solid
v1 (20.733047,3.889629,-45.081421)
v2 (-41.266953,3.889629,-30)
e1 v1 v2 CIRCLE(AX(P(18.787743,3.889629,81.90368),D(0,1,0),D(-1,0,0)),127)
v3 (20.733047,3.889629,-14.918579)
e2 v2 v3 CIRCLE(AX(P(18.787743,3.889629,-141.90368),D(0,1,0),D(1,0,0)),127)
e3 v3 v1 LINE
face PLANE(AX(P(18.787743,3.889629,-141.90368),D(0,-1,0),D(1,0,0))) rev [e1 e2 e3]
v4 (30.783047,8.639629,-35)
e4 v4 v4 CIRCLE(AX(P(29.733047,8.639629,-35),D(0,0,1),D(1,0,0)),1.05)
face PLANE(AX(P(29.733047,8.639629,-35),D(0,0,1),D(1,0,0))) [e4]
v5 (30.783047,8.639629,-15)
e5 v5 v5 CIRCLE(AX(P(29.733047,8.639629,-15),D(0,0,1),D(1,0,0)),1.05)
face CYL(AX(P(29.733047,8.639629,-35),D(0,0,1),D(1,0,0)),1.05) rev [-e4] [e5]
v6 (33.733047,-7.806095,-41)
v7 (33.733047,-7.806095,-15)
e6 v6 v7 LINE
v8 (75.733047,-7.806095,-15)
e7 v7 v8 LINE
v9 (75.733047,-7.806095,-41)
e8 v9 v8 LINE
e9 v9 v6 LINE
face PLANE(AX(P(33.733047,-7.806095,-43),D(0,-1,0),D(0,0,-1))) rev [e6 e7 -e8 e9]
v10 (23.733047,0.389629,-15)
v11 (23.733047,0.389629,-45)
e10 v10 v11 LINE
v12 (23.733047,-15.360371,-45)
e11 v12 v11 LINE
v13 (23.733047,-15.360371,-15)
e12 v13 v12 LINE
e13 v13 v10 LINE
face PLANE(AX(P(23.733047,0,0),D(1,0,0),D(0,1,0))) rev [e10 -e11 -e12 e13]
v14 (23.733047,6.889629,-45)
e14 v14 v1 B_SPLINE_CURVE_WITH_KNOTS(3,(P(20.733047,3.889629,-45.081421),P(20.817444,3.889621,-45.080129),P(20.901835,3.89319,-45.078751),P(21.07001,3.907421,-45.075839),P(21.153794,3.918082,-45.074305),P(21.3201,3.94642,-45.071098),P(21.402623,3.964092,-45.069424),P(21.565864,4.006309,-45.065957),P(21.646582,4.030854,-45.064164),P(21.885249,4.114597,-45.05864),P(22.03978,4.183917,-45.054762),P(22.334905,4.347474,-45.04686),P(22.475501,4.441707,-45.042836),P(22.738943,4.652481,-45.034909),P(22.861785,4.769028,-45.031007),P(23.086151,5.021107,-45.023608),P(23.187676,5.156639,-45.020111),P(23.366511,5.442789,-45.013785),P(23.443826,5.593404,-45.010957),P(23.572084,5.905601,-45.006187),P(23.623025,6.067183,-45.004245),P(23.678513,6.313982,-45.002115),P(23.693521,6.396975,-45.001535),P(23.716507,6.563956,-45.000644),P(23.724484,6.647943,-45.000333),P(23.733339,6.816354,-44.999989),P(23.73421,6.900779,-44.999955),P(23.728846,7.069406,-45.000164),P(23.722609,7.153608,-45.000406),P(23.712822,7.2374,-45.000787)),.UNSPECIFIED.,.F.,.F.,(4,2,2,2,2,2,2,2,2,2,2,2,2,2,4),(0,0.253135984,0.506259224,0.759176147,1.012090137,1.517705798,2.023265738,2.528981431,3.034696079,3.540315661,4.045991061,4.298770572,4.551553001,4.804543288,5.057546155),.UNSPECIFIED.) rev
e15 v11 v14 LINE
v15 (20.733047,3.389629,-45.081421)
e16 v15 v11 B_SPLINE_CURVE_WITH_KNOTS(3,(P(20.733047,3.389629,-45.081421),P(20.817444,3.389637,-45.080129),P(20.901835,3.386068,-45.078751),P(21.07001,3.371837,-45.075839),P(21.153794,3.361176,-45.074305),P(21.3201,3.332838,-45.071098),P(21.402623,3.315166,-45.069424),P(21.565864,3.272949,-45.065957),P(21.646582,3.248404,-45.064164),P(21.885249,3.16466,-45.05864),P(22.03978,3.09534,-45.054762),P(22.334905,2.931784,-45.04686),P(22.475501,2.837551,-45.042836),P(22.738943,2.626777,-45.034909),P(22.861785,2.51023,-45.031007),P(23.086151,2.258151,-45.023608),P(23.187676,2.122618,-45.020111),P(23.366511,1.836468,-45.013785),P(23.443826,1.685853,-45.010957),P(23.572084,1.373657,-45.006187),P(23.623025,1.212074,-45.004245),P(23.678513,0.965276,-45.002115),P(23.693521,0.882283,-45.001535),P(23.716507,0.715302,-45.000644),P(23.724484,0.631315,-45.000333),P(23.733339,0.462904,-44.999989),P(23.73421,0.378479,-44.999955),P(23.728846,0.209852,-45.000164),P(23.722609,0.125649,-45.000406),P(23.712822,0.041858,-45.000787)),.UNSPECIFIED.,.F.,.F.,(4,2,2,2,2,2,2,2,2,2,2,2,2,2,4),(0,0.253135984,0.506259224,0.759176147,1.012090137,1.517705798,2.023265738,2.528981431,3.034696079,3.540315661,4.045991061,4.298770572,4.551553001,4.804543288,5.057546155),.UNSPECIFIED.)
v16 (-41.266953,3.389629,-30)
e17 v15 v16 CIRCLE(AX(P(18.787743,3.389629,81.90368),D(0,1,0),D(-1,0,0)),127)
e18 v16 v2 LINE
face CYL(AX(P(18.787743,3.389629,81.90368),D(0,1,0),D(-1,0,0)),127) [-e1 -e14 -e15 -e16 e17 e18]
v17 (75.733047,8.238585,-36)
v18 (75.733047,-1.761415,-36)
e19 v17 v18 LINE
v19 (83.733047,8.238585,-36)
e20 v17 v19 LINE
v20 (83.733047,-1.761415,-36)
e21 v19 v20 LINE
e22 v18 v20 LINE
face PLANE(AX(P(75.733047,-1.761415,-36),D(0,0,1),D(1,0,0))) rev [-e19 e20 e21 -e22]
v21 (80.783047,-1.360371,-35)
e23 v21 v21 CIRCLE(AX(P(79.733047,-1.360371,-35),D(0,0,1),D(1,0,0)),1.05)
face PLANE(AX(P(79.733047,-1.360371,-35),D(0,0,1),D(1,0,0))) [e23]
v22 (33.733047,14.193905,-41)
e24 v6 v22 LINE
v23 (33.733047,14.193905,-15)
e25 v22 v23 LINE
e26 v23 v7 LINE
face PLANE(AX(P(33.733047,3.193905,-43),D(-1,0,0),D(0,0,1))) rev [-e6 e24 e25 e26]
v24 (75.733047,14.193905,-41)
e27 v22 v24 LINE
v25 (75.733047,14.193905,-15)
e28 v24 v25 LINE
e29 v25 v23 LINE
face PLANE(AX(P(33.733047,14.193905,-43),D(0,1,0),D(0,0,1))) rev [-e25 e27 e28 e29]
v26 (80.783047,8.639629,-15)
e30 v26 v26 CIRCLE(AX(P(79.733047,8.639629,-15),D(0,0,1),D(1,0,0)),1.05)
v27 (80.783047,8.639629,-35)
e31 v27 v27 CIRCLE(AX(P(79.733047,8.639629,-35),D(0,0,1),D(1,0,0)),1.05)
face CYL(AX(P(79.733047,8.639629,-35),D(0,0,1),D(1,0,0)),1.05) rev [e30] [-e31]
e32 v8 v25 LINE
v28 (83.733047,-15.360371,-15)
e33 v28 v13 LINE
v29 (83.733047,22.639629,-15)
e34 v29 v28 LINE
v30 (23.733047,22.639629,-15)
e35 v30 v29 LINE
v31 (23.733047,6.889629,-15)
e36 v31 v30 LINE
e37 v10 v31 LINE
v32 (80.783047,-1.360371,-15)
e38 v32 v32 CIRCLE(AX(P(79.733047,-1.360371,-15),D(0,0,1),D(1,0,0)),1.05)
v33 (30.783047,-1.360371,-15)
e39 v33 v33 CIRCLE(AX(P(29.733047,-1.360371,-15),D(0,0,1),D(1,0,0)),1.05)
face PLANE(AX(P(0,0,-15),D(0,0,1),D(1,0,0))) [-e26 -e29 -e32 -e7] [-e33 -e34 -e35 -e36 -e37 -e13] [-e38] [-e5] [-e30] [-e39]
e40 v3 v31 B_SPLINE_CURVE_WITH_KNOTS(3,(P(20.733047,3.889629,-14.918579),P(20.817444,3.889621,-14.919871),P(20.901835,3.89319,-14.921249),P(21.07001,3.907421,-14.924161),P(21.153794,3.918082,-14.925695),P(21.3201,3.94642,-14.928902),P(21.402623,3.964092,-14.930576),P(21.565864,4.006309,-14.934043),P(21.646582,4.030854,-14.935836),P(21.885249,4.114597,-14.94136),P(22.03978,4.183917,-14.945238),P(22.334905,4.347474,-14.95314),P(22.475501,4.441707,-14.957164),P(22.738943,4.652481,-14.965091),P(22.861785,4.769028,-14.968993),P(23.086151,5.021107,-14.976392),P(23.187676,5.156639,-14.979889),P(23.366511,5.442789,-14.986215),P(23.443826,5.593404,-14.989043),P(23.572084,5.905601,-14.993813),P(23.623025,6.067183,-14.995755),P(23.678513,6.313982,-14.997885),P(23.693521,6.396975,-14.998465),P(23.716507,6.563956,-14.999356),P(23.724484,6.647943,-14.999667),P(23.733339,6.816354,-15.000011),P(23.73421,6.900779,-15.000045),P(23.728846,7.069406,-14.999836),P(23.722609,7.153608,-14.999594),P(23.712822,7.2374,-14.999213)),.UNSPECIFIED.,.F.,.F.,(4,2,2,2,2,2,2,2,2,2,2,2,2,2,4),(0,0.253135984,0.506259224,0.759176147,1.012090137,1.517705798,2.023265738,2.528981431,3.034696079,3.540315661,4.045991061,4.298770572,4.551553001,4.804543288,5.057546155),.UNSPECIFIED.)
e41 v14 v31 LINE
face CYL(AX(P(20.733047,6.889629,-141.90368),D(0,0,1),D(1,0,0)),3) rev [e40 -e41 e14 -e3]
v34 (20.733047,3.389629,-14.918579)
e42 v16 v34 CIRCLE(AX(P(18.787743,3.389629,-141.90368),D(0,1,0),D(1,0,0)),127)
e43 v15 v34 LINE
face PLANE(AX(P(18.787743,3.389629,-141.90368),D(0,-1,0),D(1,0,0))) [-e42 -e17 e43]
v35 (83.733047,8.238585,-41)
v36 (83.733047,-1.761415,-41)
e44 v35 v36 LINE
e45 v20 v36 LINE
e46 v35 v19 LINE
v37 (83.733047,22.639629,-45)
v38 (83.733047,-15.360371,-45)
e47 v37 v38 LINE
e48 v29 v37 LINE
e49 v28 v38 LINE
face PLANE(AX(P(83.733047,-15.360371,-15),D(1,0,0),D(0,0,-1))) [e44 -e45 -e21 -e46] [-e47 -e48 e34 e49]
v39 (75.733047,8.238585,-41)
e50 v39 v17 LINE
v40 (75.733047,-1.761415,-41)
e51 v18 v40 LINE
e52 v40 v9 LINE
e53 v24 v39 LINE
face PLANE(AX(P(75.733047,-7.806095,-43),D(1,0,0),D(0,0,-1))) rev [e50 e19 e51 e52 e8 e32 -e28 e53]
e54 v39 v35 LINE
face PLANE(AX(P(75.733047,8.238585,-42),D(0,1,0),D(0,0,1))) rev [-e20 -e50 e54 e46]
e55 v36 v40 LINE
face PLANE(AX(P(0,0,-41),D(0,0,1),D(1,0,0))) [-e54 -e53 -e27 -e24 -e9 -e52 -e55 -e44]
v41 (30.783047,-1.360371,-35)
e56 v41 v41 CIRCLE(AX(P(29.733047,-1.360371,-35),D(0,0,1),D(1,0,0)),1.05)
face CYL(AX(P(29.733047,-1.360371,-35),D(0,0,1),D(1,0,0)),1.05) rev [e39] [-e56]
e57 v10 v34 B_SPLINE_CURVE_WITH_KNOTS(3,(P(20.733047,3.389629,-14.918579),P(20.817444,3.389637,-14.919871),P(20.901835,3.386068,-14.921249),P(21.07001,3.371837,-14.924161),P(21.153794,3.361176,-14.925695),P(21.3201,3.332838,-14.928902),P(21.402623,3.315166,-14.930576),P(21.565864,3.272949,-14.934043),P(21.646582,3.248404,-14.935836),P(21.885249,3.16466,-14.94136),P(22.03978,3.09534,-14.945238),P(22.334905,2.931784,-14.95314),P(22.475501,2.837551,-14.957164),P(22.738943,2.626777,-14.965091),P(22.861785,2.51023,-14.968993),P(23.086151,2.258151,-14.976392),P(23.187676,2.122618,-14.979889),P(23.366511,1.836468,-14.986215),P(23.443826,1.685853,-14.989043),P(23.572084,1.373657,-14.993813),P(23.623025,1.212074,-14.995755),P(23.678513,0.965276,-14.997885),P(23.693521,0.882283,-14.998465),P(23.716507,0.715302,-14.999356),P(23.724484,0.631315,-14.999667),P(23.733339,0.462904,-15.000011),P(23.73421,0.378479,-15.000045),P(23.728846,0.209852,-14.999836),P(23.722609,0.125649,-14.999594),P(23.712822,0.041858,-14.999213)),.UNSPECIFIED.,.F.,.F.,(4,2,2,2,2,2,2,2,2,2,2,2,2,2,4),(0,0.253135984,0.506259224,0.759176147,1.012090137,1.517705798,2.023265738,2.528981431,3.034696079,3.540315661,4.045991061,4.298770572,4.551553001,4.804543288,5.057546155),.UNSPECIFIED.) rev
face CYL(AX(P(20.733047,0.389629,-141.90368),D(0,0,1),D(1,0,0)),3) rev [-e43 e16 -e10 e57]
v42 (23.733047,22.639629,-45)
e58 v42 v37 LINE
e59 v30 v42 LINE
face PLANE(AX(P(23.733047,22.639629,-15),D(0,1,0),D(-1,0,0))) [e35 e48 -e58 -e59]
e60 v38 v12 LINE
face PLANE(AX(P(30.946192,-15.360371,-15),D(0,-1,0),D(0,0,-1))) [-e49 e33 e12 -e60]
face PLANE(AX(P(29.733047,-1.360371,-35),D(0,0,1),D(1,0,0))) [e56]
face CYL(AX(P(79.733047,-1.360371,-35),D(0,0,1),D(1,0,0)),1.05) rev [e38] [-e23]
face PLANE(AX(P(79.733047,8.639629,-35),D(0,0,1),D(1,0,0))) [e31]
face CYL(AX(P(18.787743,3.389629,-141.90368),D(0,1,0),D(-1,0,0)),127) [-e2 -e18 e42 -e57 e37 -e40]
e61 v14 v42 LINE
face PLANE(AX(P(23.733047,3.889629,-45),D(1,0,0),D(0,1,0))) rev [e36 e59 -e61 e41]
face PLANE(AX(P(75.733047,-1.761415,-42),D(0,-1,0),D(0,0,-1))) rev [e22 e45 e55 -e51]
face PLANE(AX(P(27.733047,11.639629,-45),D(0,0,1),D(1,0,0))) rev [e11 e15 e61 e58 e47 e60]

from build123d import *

# Parameters (mm, degrees)
BOSS_EXTRUDE1_DEPTH  = 4
CUT_EXTRUDE1_DEPTH   = 3
SKETCH5_W            = 49
SKETCH5_H            = 16
BOSS_EXTRUDE2_DEPTH  = 4
BOSS_EXTRUDE15_DEPTH = 30
SKETCH20_R           = 2.4
CUT_EXTRUDE26_DEPTH  = 1
FILLET8_R            = 4
FILLET12_R           = 4
CUT_EXTRUDE_8_DEPTH  = 28
SKETCH_6_R           = 1.05
CUT_EXTRUDE_9_DEPTH  = 20
SKETCH_8_W           = 6
SKETCH_8_H           = 10
CUT_EXTRUDE_10_DEPTH = 8
BOSS_EXTRUDE14_DEPTH = 4
CUT_EXTRUDE27_DEPTH  = 19
BOSS_EXTRUDE16_DEPTH = 19.25
CUT_EXTRUDE28_DEPTH  = 18.75
FILLET13_R           = 3
FILLET14_R           = 3


with BuildPart() as part:
    # Sketch2 → Boss-Extrude1 (new body)
    with BuildSketch(Plane.XY):
        with BuildLine():
            Line((23.733047461, 11.63962887), (23.733047461, -4.36037113))
            Line((23.733047461, -4.36037113), (-21.266952539, -4.36037113))
            ThreePointArc((-21.266952539, -4.36037113), (-27.597931628, 3.63962887), (-21.266952539, 11.63962887))
            Line((-21.266952539, 11.63962887), (23.733047461, 11.63962887))
        make_face()
    extrude(amount=BOSS_EXTRUDE1_DEPTH)

    # Sketch1 → Cut-Extrude1 (cut)
    with BuildSketch(Plane.XY):
        with BuildLine():
            Line((-6.25004119, 8.63962887), (-20.04279291, 6.23962887))
            ThreePointArc((-20.04279291, 6.23962887), (-22.105421524, 3.63962887), (-20.04279291, 1.03962887))
            Line((-20.04279291, 1.03962887), (-6.25004119, -1.36037113))
            ThreePointArc((-6.25004119, -1.36037113), (-2.105421524, -2.86037113), (2.039198142, -1.36037113))
            Line((2.039198142, -1.36037113), (15.831949862, 1.03962887))
            ThreePointArc((15.831949862, 1.03962887), (17.894578476, 3.63962887), (15.831949862, 6.23962887))
            Line((15.831949862, 6.23962887), (2.039198142, 8.63962887))
            ThreePointArc((2.039198142, 8.63962887), (-2.105421524, 10.13962887), (-6.25004119, 8.63962887))
        make_face()
    extrude(amount=CUT_EXTRUDE1_DEPTH, mode=Mode.SUBTRACT)

    # Sketch5 → Boss-Extrude2 (add)
    with BuildSketch(Plane(origin=(23.733047461, 0, 0), x_dir=(0, 0, -1), z_dir=(1, 0, 0))):
        with Locations((20.5, 3.63962887)):
            Rectangle(SKETCH5_W, SKETCH5_H)
    extrude(amount=BOSS_EXTRUDE2_DEPTH)

    # Sketch6 → Boss-Extrude15 (add)
    with BuildSketch(Plane(origin=(0, 0, -45), x_dir=(-1, 0, 0), z_dir=(0, 0, -1))):
        Polygon((-30.946192459, -15.36037113), (-83.733047461, -15.36037113), (-83.733047461, 22.63962887), (-23.733047461, 22.63962887), (-23.733047461, -15.36037113), align=None)
    extrude(amount=-BOSS_EXTRUDE15_DEPTH)

    # Sketch20 → Cut-Extrude26 (cut)
    with BuildSketch(Plane(origin=(0, 0, 3), x_dir=(-1, 0, 0), z_dir=(0, 0, -1))):
        with Locations((2.105421524, 3.63962887)):
            Circle(SKETCH20_R)
    extrude(amount=-CUT_EXTRUDE26_DEPTH, mode=Mode.SUBTRACT)

    # Fillet8
    fillet8_edges = [part.edges().sort_by_distance(p)[0] for p in [
        (23.733047461, 3.63962887, 0),
    ]]
    fillet(fillet8_edges, radius=FILLET8_R)

    # Fillet12
    fillet12_edges = [part.edges().sort_by_distance(p)[0] for p in [
        (27.733047461, 3.63962887, 4),
    ]]
    fillet(fillet12_edges, radius=FILLET12_R)

    # 草圖5 → 除料-伸長8 (cut)
    with BuildSketch(Plane.XY.offset(-15)):
        Polygon((75.733047461, -7.806095257), (75.733047461, 14.193904743), (33.733047461, 14.193904743), (33.733047461, 3.193904743), (33.733047461, -7.806095257), align=None)
    extrude(amount=-CUT_EXTRUDE_8_DEPTH, mode=Mode.SUBTRACT)

    # 草圖6 → 除料-伸長9 (cut)
    with BuildSketch(Plane.XY.offset(-15)):
        with Locations((29.733047461, 8.63962887)):
            Circle(SKETCH_6_R)
        with Locations((29.733047461, -1.36037113)):
            Circle(SKETCH_6_R)
        with Locations((79.733047461, 8.63962887)):
            Circle(SKETCH_6_R)
        with Locations((79.733047461, -1.36037113)):
            Circle(SKETCH_6_R)
    extrude(amount=-CUT_EXTRUDE_9_DEPTH, mode=Mode.SUBTRACT)

    # 草圖8 → 除料-伸長10 (cut)
    with BuildSketch(Plane(origin=(83.733047461, 0, 0), x_dir=(0, 0, -1), z_dir=(1, 0, 0))):
        with Locations((39, 3.238584995)):
            Rectangle(SKETCH_8_W, SKETCH_8_H)
    extrude(amount=-CUT_EXTRUDE_10_DEPTH, mode=Mode.SUBTRACT)

    # Sketch6<2> → Boss-Extrude14 (add)
    with BuildSketch(Plane(origin=(0, 0, -45), x_dir=(-1, 0, 0), z_dir=(0, 0, -1))):
        Polygon((-30.946192459, -15.36037113), (-83.733047461, -15.36037113), (-83.733047461, 22.63962887), (-23.733047461, 22.63962887), (-23.733047461, -15.36037113), align=None)
    extrude(amount=-BOSS_EXTRUDE14_DEPTH)

    # Sketch21 → Cut-Extrude27 (cut)
    with BuildSketch(Plane.XY.offset(4)):
        Polygon((-21.266952539, 11.63962887), (23.733047461, 11.63962887), (27.733047461, 11.63962887), (27.733047461, -4.36037113), (-21.266952539, -4.36037113), (-27.597931628, -4.36037113), (-27.597931628, 3.63962887), (-27.597931628, 11.63962887), align=None)
    extrude(amount=-CUT_EXTRUDE27_DEPTH, mode=Mode.SUBTRACT)

    # Sketch26 → Boss-Extrude16 (add)
    with BuildSketch(Plane(origin=(0, 22.63962887, 0), x_dir=(1, 0, 0), z_dir=(0, 1, 0))):
        with BuildLine():
            Line((23.733047461, 45), (23.733047461, 15))
            ThreePointArc((23.733047461, 15), (-9.769414537, 18.155998007), (-41.266952539, 30))
            ThreePointArc((-41.266952539, 30), (-9.769414537, 41.844001993), (23.733047461, 45))
        make_face()
    extrude(amount=-BOSS_EXTRUDE16_DEPTH)

    # Sketch26<2> → Cut-Extrude28 (cut)
    with BuildSketch(Plane(origin=(0, 22.63962887, 0), x_dir=(1, 0, 0), z_dir=(0, 1, 0))):
        with BuildLine():
            Line((23.733047461, 45), (23.733047461, 15))
            ThreePointArc((23.733047461, 15), (-9.769414537, 18.155998007), (-41.266952539, 30))
            ThreePointArc((-41.266952539, 30), (-9.769414537, 41.844001993), (23.733047461, 45))
        make_face()
    extrude(amount=-CUT_EXTRUDE28_DEPTH, mode=Mode.SUBTRACT)

    # Fillet13
    # the kernel refuses this fillet: 3 mm, written as the material it adds along each edge
    with BuildSketch(Plane(origin=(23.733047461, 3.38962887, -52.5), x_dir=(0, -1, 0), z_dir=(0, 0, 1))) as fillet13_piece_1_section:
        with BuildLine():
            CenterArc((FILLET13_R, -FILLET13_R), FILLET13_R, 90, 90)
            Line((0, -FILLET13_R), (0, 0))
            Line((0, 0), (FILLET13_R, 0))
        make_face()
    fillet13_piece_1 = extrude(amount=37.5, mode=Mode.PRIVATE)
    fillet13_piece_1 = split(fillet13_piece_1, bisect_by=Plane(origin=(22.499991294, 3.049704753, -45), z_dir=(0, 0, -1)), keep=Keep.TOP, mode=Mode.PRIVATE)
    fillet13_piece_1 = fillet13_piece_1 & Plane(origin=(18.787742814, 3.049704753, 81.90367986), x_dir=(-0.472871616946814, 0, -0.8811313374781911), z_dir=(0, 1, 0)) * Cylinder(127, 87, mode=Mode.PRIVATE)
    add(fillet13_piece_1)
    with BuildSketch(Plane(origin=(23.733047461, 3.38962887, -45), x_dir=(0, -1, 0), z_dir=(0, 0, 1))) as fillet13_piece_2:
        with BuildLine():
            CenterArc((FILLET13_R, -FILLET13_R), FILLET13_R, 90, 90)
            Line((0, -FILLET13_R), (0, 0))
            Line((0, 0), (FILLET13_R, 0))
        make_face()
    extrude(amount=30)
    with BuildSketch(Plane(origin=(23.733047461, 3.38962887, -45), x_dir=(0, -1, 0), z_dir=(0, 0, 1))) as fillet13_piece_3_section:
        with BuildLine():
            CenterArc((FILLET13_R, -FILLET13_R), FILLET13_R, 90, 90)
            Line((0, -FILLET13_R), (0, 0))
            Line((0, 0), (FILLET13_R, 0))
        make_face()
    fillet13_piece_3 = extrude(amount=37.5, mode=Mode.PRIVATE)
    fillet13_piece_3 = split(fillet13_piece_3, bisect_by=Plane(origin=(22.499977065, 3.049704014, -15), z_dir=(0, 0, 1)), keep=Keep.TOP, mode=Mode.PRIVATE)
    fillet13_piece_3 = fillet13_piece_3 & Plane(origin=(18.787742814, 3.049704014, -141.90367986), x_dir=(0.03893940667523239, 0, 0.9992415736986632), z_dir=(0, 1, 0)) * Cylinder(127, 87, mode=Mode.PRIVATE)
    add(fillet13_piece_3)

    # Fillet14
    # the kernel refuses this fillet: 3 mm, written as the material it adds along each edge
    with BuildSketch(Plane(origin=(23.733047461, 3.88962887, -52.5), x_dir=(-1, 0, 0), z_dir=(0, 0, 1))) as fillet14_piece_1_section:
        with BuildLine():
            CenterArc((FILLET14_R, -FILLET14_R), FILLET14_R, 90, 90)
            Line((0, -FILLET14_R), (0, 0))
            Line((0, 0), (FILLET14_R, 0))
        make_face()
    fillet14_piece_1 = extrude(amount=37.5, mode=Mode.PRIVATE)
    fillet14_piece_1 = fillet14_piece_1 & Plane(origin=(18.787742814, 4.229564141, 81.90367986), x_dir=(-0.472871616947038, 0, -0.8811313374780708), z_dir=(0, 1, 0)) * Cylinder(127, 87, mode=Mode.PRIVATE)
    fillet14_piece_1 = split(fillet14_piece_1, bisect_by=Plane(origin=(22.499997124, 4.229564141, -45), z_dir=(0, 0, -1)), keep=Keep.TOP, mode=Mode.PRIVATE)
    add(fillet14_piece_1)
    with BuildSketch(Plane(origin=(23.733047461, 3.88962887, -45), x_dir=(-1, 0, 0), z_dir=(0, 0, 1))) as fillet14_piece_2:
        with BuildLine():
            CenterArc((FILLET14_R, -FILLET14_R), FILLET14_R, 90, 90)
            Line((0, -FILLET14_R), (0, 0))
            Line((0, 0), (FILLET14_R, 0))
        make_face()
    extrude(amount=30)
    with BuildSketch(Plane(origin=(23.733047461, 3.88962887, -45), x_dir=(-1, 0, 0), z_dir=(0, 0, 1))) as fillet14_piece_3_section:
        with BuildLine():
            CenterArc((FILLET14_R, -FILLET14_R), FILLET14_R, 90, 90)
            Line((0, -FILLET14_R), (0, 0))
            Line((0, 0), (FILLET14_R, 0))
        make_face()
    fillet14_piece_3 = extrude(amount=37.5, mode=Mode.PRIVATE)
    fillet14_piece_3 = fillet14_piece_3 & Plane(origin=(18.787742814, 4.229551156, -141.90367986), x_dir=(0.03893940667498725, 0, 0.9992415736986727), z_dir=(0, 1, 0)) * Cylinder(127, 87, mode=Mode.PRIVATE)
    fillet14_piece_3 = split(fillet14_piece_3, bisect_by=Plane(origin=(22.499980416, 4.229551156, -15), z_dir=(0, 0, 1)), keep=Keep.TOP, mode=Mode.PRIVATE)
    add(fillet14_piece_3)


solid = part.part
